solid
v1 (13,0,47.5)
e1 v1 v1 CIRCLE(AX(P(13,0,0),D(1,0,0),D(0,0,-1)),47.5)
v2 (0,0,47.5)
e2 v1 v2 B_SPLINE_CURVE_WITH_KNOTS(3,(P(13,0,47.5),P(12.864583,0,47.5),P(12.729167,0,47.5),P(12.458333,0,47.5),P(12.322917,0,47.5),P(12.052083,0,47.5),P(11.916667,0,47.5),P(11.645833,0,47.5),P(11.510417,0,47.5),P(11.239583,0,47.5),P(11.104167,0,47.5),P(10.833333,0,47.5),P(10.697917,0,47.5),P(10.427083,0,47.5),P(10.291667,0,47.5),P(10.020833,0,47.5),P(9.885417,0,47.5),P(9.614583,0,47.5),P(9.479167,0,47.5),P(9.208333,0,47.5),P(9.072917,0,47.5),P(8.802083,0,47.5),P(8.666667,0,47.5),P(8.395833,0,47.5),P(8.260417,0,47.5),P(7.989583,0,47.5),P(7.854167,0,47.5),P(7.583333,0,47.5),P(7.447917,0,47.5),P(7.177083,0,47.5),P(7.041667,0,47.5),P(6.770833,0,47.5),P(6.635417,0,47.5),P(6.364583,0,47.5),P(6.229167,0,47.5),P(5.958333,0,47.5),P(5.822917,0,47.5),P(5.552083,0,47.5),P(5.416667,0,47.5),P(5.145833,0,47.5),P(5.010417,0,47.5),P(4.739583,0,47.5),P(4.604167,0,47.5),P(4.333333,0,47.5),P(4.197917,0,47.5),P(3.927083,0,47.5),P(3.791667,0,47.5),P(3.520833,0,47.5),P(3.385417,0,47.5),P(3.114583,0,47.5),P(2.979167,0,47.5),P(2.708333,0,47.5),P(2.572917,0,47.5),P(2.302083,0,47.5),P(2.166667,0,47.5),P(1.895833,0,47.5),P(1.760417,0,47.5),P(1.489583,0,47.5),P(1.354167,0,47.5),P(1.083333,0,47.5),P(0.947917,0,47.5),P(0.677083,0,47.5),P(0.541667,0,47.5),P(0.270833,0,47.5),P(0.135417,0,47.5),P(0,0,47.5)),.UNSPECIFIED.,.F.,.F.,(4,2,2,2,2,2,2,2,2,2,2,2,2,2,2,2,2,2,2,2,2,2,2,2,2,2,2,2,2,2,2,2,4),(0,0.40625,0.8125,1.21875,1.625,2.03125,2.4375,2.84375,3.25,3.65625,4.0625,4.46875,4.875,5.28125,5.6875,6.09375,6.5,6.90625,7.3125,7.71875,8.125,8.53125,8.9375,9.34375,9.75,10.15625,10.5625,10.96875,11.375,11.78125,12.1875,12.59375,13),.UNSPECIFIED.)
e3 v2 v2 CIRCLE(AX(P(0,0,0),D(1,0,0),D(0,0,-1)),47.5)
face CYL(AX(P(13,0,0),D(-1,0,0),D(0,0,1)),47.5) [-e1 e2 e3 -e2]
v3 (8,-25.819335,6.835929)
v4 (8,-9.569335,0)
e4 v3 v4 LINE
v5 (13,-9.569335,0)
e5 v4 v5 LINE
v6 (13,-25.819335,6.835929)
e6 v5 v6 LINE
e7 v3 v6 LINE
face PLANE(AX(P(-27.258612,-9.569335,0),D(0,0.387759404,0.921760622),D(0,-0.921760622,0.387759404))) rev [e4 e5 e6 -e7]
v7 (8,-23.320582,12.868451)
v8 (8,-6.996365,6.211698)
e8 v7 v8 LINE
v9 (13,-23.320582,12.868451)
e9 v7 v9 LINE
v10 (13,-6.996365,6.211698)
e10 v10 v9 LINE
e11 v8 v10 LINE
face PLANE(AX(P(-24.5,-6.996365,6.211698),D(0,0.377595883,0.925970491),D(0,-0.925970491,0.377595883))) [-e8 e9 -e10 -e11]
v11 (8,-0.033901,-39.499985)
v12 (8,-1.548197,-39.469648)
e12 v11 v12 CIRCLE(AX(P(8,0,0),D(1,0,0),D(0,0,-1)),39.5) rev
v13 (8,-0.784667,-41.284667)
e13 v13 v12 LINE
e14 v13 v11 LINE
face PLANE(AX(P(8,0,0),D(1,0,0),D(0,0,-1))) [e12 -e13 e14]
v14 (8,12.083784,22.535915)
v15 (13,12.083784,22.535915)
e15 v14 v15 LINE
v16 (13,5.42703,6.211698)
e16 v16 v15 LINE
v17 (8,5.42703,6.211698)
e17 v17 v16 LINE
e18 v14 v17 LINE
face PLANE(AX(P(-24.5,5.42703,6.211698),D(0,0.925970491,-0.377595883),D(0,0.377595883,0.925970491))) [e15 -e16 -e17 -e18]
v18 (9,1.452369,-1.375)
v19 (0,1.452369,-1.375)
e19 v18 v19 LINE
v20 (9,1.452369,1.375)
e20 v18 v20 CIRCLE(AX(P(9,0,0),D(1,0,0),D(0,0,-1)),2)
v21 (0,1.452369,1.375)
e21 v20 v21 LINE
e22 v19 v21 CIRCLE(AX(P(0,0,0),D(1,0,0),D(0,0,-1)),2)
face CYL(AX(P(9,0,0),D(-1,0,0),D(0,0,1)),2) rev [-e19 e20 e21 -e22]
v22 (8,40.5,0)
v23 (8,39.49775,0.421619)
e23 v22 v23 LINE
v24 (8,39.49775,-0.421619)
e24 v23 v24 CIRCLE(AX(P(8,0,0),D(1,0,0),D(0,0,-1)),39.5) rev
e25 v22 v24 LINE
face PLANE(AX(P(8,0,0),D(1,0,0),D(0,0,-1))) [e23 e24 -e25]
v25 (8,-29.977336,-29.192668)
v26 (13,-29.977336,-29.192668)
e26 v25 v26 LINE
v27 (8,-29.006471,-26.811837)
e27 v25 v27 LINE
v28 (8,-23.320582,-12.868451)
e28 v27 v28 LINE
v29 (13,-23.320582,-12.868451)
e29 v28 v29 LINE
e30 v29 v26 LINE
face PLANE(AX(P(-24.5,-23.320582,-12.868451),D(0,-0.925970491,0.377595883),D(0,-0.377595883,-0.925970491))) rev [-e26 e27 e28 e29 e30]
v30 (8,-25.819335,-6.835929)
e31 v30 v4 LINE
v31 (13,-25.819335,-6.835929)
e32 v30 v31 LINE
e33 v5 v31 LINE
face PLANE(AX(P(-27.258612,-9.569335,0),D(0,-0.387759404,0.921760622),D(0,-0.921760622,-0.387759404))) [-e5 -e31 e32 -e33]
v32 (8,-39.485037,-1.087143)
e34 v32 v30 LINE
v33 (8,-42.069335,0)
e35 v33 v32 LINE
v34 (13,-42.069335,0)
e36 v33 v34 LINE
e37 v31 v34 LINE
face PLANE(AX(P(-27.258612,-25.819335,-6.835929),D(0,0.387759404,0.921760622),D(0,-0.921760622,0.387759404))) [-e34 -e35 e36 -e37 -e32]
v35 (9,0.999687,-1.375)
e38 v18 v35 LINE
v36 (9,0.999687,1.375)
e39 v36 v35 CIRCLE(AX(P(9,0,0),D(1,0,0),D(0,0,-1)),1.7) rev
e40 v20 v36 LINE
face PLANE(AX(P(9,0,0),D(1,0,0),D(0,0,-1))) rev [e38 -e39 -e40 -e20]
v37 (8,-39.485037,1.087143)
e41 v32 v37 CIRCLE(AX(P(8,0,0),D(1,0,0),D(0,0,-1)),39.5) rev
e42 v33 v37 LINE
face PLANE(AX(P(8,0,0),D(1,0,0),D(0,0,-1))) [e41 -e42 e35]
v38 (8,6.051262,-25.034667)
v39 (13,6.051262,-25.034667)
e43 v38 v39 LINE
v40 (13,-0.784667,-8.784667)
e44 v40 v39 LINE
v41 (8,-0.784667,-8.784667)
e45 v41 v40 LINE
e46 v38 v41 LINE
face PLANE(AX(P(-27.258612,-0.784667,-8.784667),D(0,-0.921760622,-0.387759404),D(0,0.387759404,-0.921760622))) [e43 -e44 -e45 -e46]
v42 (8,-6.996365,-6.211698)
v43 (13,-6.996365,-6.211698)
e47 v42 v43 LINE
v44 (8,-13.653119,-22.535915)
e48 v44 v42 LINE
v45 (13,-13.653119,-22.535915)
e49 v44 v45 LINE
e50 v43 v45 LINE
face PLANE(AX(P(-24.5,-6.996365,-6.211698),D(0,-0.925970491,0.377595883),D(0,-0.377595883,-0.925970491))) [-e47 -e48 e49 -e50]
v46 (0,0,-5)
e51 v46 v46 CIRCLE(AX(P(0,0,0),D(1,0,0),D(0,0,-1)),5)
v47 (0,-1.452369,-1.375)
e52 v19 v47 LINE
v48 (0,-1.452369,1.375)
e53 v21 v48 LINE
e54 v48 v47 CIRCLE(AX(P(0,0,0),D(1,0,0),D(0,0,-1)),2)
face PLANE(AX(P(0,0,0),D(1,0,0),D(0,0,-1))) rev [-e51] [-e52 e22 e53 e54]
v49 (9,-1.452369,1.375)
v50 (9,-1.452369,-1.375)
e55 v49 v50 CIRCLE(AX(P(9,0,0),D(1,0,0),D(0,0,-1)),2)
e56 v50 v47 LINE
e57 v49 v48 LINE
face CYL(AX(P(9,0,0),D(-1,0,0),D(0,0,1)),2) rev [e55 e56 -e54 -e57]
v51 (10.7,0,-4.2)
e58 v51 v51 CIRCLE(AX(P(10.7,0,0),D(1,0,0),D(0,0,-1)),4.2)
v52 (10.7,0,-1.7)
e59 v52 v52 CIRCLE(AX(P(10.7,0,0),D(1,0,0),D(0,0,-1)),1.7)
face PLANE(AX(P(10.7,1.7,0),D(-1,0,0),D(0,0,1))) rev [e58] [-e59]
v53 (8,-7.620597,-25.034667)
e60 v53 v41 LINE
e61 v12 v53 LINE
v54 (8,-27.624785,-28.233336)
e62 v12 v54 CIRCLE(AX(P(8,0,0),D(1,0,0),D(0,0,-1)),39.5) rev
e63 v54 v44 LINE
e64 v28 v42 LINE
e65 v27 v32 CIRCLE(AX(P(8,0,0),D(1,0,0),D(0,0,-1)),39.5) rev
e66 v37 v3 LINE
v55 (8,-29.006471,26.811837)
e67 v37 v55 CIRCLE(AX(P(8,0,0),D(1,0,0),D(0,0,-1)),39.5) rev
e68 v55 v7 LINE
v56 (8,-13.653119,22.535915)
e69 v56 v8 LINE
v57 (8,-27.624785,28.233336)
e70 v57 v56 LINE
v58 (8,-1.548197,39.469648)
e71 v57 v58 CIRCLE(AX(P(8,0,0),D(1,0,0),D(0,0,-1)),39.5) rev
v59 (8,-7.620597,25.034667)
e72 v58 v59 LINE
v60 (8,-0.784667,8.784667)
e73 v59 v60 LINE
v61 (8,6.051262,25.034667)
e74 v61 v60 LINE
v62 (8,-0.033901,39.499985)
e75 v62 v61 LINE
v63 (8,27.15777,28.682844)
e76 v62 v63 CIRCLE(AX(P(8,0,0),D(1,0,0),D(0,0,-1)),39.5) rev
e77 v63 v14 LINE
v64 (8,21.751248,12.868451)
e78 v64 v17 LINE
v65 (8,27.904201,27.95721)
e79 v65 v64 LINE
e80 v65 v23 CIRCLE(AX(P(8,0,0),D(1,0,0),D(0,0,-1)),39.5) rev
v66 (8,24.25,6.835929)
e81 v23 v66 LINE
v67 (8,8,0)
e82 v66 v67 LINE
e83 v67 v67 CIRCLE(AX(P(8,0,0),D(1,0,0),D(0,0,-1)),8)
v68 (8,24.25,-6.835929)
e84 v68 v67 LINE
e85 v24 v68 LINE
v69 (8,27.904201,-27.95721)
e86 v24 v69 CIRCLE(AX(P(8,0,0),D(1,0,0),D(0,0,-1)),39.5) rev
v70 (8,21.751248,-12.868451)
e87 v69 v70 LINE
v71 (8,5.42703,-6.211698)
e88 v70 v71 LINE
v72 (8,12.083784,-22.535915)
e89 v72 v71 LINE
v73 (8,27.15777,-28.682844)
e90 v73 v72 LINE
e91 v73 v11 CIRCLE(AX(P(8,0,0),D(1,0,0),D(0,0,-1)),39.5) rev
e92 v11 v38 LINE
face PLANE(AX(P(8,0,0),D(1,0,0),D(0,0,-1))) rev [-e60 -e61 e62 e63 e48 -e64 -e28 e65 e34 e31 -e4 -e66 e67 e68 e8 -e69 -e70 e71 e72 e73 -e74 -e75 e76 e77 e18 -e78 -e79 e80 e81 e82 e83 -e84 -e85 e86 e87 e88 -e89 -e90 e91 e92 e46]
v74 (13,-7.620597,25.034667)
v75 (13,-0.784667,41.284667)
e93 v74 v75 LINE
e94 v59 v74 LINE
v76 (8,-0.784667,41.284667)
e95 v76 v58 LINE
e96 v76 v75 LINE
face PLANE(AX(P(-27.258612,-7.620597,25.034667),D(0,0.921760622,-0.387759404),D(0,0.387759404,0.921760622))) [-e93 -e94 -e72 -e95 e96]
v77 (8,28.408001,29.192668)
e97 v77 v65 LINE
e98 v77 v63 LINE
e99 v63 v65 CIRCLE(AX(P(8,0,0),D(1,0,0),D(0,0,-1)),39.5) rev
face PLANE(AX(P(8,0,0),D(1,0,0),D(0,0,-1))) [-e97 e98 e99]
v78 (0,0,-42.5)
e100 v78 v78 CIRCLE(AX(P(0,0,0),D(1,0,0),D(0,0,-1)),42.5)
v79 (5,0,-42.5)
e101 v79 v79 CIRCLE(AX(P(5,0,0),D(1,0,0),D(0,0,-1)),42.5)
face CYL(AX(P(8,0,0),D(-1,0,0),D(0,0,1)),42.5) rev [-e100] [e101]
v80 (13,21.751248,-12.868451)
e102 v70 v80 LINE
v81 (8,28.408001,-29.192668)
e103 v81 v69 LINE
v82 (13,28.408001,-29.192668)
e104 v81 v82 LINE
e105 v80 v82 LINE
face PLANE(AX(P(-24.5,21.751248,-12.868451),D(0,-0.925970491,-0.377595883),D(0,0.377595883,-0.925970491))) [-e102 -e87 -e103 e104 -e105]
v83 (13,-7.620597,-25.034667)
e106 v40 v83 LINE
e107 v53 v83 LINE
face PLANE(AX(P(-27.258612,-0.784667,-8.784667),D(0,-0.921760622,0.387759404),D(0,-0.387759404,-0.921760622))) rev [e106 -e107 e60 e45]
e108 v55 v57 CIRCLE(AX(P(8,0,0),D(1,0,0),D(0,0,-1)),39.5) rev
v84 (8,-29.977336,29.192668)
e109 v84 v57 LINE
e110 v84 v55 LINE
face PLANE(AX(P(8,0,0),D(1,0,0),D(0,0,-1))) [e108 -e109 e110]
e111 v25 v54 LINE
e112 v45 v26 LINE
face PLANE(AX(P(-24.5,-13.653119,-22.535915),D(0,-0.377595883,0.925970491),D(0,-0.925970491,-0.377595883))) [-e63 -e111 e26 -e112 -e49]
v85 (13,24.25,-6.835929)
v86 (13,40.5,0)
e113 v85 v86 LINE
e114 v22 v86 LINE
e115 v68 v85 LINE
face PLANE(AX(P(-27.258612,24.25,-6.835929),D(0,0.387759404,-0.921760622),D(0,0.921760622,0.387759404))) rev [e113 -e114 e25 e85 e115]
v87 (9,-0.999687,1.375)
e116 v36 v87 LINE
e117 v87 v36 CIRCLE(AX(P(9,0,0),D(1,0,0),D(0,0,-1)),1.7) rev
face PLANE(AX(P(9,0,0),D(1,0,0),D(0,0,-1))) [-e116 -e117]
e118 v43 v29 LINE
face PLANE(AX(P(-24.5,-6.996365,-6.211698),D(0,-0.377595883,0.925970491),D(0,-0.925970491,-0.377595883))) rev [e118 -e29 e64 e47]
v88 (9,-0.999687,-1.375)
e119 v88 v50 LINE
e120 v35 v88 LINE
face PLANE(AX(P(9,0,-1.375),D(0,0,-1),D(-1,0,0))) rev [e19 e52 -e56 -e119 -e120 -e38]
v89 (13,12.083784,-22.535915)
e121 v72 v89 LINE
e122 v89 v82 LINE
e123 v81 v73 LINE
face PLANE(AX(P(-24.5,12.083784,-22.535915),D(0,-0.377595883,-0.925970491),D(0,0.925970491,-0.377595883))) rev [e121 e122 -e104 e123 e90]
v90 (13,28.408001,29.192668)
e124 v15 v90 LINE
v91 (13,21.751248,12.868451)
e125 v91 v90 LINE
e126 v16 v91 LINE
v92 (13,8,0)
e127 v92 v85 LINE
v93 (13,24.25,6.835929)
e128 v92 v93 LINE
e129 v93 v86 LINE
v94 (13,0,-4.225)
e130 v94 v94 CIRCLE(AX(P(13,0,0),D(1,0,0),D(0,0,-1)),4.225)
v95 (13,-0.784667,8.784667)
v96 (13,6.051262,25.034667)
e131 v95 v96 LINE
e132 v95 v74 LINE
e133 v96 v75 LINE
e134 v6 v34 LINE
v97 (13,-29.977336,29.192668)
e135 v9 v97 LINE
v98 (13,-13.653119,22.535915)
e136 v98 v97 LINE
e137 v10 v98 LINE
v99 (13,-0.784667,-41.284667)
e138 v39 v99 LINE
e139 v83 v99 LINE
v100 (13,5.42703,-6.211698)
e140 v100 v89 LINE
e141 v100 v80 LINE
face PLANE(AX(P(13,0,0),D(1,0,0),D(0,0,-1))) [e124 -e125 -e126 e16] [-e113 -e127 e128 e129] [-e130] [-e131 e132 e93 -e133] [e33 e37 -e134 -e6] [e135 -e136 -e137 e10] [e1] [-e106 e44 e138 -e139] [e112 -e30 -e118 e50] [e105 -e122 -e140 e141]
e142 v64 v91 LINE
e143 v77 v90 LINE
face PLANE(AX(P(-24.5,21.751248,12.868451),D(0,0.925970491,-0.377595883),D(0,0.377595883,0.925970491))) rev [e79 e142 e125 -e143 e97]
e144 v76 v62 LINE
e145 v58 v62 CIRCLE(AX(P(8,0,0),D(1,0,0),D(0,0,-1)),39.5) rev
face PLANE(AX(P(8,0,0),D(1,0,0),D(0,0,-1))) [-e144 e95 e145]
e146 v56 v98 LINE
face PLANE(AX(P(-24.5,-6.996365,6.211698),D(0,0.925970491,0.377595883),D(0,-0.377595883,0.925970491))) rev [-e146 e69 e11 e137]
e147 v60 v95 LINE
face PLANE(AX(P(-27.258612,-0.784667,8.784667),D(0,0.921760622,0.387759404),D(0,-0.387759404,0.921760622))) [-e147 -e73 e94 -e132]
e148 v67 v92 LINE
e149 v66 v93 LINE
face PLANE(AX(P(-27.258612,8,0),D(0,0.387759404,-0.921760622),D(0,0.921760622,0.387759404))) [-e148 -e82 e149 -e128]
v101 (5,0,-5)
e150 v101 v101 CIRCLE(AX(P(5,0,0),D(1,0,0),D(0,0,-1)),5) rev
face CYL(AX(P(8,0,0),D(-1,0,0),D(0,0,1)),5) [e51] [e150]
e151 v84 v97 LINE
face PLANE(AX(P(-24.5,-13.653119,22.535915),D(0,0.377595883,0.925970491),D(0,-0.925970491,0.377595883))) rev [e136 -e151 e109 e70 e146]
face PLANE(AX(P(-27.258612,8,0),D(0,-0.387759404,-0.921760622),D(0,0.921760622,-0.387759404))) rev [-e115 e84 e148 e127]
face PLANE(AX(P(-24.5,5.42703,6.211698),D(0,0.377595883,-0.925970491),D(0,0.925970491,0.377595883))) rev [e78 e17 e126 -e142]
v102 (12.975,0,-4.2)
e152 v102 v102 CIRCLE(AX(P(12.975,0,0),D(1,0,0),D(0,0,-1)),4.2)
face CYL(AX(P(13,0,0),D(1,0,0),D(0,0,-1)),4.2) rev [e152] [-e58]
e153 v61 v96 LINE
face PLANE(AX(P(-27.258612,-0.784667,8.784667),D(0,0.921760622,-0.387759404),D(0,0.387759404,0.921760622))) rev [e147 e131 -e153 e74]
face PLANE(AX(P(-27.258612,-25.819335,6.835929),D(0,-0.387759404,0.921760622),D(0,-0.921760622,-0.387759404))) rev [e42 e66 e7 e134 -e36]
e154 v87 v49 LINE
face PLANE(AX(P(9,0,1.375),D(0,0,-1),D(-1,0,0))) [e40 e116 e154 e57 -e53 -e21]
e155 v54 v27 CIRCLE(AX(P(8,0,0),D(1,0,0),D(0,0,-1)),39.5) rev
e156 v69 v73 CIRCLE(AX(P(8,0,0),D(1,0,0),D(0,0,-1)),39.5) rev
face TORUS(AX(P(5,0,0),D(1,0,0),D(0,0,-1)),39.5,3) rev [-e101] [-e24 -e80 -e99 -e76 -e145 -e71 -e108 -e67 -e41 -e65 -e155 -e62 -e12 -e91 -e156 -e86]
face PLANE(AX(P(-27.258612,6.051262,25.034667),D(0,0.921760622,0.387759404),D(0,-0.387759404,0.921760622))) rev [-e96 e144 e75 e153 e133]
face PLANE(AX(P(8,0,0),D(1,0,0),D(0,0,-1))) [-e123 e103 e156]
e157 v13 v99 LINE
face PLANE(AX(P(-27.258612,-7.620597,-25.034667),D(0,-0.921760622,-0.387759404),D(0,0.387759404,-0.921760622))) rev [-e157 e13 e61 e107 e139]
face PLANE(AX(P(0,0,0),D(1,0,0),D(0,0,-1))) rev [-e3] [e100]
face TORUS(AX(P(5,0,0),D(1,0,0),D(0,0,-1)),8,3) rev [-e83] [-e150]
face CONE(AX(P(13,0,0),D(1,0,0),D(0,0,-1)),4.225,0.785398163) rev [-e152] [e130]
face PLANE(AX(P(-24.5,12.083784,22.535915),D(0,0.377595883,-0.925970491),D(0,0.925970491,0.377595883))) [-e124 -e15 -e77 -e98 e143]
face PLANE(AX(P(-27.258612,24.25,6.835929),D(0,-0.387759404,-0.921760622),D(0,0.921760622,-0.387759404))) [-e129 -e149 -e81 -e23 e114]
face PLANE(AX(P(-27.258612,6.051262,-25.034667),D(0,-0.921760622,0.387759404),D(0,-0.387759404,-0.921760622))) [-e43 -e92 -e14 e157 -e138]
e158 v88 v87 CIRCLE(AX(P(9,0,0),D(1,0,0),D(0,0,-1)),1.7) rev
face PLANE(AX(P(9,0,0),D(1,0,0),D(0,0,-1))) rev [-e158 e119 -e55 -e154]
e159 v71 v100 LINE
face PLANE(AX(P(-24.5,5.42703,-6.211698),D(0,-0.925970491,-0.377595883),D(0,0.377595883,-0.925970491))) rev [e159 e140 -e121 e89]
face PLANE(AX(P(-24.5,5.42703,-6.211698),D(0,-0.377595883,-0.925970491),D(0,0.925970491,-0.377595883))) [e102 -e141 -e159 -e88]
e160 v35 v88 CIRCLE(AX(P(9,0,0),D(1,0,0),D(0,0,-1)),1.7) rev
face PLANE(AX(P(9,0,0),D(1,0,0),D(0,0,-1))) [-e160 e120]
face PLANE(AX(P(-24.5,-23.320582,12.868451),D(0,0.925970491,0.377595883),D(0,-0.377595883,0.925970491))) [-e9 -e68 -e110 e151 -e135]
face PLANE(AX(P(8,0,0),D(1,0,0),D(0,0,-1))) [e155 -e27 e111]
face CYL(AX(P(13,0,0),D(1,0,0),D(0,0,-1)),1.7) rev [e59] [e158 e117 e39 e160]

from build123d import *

# Parameters (mm, degrees)
SKETCH2_R           = 47.5
BOSS_EXTRUDE1_DEPTH = 13
SKETCH2_4_R         = 42.5
SKETCH2_4_R_2       = 5
CUT_EXTRUDE1_DEPTH  = 8
CUT_EXTRUDE2_DEPTH  = 9
FILLET1_R           = 3
FILLET2_R           = 3
CUT_EXTRUDE4_DEPTH  = 5
CIRPATTERN1_COUNT   = 8


# Read off the part's stored shape, not the designer's step: CBORE for M3 Hex Head Machine Screw1
with BuildPart() as part:
    # Sketch2 → Boss-Extrude1 (new body)
    with BuildSketch(Plane(origin=(0, 0, 0), x_dir=(0, 0, -1), z_dir=(1, 0, 0))):
        with Locations(Location((0, 0, 0), (0, 0, 180))):
            Circle(SKETCH2_R)
    extrude(amount=BOSS_EXTRUDE1_DEPTH)

    # Sketch2<4> → Cut-Extrude1 (cut)
    with BuildSketch(Plane(origin=(0, 0, 0), x_dir=(0, 0, -1), z_dir=(1, 0, 0))):
        Circle(SKETCH2_4_R)
        Circle(SKETCH2_4_R_2, mode=Mode.SUBTRACT)
    extrude(amount=CUT_EXTRUDE1_DEPTH, mode=Mode.SUBTRACT)

    # Sketch2<5> → Cut-Extrude2 (cut)
    with BuildSketch(Plane(origin=(0, 0, 0), x_dir=(0, 0, -1), z_dir=(1, 0, 0))):
        with BuildLine():
            ThreePointArc((1.375, 1.452368755), (0, 2), (-1.375, 1.452368755))
            Line((-1.375, 1.452368755), (-1.375, -1.452368755))
            ThreePointArc((-1.375, -1.452368755), (0, -2), (1.375, -1.452368755))
            Line((1.375, -1.452368755), (1.375, 1.452368755))
        make_face()
    extrude(amount=CUT_EXTRUDE2_DEPTH, mode=Mode.SUBTRACT)

    # Fillet1
    fillet1_edges = [part.edges().sort_by_distance(p)[0] for p in [
        (8, 0, 5),
    ]]
    fillet(fillet1_edges, radius=FILLET1_R)

    # Fillet2
    fillet2_edges = [part.edges().sort_by_distance(p)[0] for p in [
        (8, 0, 42.5),
    ]]
    fillet(fillet2_edges, radius=FILLET2_R)

    # Sketch4 → Cut-Extrude4 (cut)
    with BuildSketch(Plane(origin=(13, 0, 0), x_dir=(0, 0, -1), z_dir=(1, 0, 0))):
        Polygon((0, 8), (6.83592916, 24.25), (0, 40.5), (-6.83592916, 24.25), align=None)
    cut_extrude4 = extrude(amount=-CUT_EXTRUDE4_DEPTH, mode=Mode.SUBTRACT)

    # CirPattern1: Cut-Extrude4 ×8 about axis
    cirpattern1_axis = Axis((0, -0.784667472, 0), (1, 0, 0))
    for i in range(1, CIRPATTERN1_COUNT):
        add(cut_extrude4.rotate(cirpattern1_axis, i * 360 / CIRPATTERN1_COUNT), mode=Mode.SUBTRACT)

    # CBORE for M3 Hex Head Machine Screw1 out → CBORE for M3 Hex Head Machine Screw1 (revolve, cut)
    with BuildSketch(Plane.YX):
        Polygon((0, 9), (1.7, 9), (1.7, 10.7), (4.2, 10.7), (4.2, 12.975), (4.225, 13), (0, 13), align=None)
    revolve(axis=Axis((0, 0, 0), (1, 0, 0)), mode=Mode.SUBTRACT)


solid = part.part
